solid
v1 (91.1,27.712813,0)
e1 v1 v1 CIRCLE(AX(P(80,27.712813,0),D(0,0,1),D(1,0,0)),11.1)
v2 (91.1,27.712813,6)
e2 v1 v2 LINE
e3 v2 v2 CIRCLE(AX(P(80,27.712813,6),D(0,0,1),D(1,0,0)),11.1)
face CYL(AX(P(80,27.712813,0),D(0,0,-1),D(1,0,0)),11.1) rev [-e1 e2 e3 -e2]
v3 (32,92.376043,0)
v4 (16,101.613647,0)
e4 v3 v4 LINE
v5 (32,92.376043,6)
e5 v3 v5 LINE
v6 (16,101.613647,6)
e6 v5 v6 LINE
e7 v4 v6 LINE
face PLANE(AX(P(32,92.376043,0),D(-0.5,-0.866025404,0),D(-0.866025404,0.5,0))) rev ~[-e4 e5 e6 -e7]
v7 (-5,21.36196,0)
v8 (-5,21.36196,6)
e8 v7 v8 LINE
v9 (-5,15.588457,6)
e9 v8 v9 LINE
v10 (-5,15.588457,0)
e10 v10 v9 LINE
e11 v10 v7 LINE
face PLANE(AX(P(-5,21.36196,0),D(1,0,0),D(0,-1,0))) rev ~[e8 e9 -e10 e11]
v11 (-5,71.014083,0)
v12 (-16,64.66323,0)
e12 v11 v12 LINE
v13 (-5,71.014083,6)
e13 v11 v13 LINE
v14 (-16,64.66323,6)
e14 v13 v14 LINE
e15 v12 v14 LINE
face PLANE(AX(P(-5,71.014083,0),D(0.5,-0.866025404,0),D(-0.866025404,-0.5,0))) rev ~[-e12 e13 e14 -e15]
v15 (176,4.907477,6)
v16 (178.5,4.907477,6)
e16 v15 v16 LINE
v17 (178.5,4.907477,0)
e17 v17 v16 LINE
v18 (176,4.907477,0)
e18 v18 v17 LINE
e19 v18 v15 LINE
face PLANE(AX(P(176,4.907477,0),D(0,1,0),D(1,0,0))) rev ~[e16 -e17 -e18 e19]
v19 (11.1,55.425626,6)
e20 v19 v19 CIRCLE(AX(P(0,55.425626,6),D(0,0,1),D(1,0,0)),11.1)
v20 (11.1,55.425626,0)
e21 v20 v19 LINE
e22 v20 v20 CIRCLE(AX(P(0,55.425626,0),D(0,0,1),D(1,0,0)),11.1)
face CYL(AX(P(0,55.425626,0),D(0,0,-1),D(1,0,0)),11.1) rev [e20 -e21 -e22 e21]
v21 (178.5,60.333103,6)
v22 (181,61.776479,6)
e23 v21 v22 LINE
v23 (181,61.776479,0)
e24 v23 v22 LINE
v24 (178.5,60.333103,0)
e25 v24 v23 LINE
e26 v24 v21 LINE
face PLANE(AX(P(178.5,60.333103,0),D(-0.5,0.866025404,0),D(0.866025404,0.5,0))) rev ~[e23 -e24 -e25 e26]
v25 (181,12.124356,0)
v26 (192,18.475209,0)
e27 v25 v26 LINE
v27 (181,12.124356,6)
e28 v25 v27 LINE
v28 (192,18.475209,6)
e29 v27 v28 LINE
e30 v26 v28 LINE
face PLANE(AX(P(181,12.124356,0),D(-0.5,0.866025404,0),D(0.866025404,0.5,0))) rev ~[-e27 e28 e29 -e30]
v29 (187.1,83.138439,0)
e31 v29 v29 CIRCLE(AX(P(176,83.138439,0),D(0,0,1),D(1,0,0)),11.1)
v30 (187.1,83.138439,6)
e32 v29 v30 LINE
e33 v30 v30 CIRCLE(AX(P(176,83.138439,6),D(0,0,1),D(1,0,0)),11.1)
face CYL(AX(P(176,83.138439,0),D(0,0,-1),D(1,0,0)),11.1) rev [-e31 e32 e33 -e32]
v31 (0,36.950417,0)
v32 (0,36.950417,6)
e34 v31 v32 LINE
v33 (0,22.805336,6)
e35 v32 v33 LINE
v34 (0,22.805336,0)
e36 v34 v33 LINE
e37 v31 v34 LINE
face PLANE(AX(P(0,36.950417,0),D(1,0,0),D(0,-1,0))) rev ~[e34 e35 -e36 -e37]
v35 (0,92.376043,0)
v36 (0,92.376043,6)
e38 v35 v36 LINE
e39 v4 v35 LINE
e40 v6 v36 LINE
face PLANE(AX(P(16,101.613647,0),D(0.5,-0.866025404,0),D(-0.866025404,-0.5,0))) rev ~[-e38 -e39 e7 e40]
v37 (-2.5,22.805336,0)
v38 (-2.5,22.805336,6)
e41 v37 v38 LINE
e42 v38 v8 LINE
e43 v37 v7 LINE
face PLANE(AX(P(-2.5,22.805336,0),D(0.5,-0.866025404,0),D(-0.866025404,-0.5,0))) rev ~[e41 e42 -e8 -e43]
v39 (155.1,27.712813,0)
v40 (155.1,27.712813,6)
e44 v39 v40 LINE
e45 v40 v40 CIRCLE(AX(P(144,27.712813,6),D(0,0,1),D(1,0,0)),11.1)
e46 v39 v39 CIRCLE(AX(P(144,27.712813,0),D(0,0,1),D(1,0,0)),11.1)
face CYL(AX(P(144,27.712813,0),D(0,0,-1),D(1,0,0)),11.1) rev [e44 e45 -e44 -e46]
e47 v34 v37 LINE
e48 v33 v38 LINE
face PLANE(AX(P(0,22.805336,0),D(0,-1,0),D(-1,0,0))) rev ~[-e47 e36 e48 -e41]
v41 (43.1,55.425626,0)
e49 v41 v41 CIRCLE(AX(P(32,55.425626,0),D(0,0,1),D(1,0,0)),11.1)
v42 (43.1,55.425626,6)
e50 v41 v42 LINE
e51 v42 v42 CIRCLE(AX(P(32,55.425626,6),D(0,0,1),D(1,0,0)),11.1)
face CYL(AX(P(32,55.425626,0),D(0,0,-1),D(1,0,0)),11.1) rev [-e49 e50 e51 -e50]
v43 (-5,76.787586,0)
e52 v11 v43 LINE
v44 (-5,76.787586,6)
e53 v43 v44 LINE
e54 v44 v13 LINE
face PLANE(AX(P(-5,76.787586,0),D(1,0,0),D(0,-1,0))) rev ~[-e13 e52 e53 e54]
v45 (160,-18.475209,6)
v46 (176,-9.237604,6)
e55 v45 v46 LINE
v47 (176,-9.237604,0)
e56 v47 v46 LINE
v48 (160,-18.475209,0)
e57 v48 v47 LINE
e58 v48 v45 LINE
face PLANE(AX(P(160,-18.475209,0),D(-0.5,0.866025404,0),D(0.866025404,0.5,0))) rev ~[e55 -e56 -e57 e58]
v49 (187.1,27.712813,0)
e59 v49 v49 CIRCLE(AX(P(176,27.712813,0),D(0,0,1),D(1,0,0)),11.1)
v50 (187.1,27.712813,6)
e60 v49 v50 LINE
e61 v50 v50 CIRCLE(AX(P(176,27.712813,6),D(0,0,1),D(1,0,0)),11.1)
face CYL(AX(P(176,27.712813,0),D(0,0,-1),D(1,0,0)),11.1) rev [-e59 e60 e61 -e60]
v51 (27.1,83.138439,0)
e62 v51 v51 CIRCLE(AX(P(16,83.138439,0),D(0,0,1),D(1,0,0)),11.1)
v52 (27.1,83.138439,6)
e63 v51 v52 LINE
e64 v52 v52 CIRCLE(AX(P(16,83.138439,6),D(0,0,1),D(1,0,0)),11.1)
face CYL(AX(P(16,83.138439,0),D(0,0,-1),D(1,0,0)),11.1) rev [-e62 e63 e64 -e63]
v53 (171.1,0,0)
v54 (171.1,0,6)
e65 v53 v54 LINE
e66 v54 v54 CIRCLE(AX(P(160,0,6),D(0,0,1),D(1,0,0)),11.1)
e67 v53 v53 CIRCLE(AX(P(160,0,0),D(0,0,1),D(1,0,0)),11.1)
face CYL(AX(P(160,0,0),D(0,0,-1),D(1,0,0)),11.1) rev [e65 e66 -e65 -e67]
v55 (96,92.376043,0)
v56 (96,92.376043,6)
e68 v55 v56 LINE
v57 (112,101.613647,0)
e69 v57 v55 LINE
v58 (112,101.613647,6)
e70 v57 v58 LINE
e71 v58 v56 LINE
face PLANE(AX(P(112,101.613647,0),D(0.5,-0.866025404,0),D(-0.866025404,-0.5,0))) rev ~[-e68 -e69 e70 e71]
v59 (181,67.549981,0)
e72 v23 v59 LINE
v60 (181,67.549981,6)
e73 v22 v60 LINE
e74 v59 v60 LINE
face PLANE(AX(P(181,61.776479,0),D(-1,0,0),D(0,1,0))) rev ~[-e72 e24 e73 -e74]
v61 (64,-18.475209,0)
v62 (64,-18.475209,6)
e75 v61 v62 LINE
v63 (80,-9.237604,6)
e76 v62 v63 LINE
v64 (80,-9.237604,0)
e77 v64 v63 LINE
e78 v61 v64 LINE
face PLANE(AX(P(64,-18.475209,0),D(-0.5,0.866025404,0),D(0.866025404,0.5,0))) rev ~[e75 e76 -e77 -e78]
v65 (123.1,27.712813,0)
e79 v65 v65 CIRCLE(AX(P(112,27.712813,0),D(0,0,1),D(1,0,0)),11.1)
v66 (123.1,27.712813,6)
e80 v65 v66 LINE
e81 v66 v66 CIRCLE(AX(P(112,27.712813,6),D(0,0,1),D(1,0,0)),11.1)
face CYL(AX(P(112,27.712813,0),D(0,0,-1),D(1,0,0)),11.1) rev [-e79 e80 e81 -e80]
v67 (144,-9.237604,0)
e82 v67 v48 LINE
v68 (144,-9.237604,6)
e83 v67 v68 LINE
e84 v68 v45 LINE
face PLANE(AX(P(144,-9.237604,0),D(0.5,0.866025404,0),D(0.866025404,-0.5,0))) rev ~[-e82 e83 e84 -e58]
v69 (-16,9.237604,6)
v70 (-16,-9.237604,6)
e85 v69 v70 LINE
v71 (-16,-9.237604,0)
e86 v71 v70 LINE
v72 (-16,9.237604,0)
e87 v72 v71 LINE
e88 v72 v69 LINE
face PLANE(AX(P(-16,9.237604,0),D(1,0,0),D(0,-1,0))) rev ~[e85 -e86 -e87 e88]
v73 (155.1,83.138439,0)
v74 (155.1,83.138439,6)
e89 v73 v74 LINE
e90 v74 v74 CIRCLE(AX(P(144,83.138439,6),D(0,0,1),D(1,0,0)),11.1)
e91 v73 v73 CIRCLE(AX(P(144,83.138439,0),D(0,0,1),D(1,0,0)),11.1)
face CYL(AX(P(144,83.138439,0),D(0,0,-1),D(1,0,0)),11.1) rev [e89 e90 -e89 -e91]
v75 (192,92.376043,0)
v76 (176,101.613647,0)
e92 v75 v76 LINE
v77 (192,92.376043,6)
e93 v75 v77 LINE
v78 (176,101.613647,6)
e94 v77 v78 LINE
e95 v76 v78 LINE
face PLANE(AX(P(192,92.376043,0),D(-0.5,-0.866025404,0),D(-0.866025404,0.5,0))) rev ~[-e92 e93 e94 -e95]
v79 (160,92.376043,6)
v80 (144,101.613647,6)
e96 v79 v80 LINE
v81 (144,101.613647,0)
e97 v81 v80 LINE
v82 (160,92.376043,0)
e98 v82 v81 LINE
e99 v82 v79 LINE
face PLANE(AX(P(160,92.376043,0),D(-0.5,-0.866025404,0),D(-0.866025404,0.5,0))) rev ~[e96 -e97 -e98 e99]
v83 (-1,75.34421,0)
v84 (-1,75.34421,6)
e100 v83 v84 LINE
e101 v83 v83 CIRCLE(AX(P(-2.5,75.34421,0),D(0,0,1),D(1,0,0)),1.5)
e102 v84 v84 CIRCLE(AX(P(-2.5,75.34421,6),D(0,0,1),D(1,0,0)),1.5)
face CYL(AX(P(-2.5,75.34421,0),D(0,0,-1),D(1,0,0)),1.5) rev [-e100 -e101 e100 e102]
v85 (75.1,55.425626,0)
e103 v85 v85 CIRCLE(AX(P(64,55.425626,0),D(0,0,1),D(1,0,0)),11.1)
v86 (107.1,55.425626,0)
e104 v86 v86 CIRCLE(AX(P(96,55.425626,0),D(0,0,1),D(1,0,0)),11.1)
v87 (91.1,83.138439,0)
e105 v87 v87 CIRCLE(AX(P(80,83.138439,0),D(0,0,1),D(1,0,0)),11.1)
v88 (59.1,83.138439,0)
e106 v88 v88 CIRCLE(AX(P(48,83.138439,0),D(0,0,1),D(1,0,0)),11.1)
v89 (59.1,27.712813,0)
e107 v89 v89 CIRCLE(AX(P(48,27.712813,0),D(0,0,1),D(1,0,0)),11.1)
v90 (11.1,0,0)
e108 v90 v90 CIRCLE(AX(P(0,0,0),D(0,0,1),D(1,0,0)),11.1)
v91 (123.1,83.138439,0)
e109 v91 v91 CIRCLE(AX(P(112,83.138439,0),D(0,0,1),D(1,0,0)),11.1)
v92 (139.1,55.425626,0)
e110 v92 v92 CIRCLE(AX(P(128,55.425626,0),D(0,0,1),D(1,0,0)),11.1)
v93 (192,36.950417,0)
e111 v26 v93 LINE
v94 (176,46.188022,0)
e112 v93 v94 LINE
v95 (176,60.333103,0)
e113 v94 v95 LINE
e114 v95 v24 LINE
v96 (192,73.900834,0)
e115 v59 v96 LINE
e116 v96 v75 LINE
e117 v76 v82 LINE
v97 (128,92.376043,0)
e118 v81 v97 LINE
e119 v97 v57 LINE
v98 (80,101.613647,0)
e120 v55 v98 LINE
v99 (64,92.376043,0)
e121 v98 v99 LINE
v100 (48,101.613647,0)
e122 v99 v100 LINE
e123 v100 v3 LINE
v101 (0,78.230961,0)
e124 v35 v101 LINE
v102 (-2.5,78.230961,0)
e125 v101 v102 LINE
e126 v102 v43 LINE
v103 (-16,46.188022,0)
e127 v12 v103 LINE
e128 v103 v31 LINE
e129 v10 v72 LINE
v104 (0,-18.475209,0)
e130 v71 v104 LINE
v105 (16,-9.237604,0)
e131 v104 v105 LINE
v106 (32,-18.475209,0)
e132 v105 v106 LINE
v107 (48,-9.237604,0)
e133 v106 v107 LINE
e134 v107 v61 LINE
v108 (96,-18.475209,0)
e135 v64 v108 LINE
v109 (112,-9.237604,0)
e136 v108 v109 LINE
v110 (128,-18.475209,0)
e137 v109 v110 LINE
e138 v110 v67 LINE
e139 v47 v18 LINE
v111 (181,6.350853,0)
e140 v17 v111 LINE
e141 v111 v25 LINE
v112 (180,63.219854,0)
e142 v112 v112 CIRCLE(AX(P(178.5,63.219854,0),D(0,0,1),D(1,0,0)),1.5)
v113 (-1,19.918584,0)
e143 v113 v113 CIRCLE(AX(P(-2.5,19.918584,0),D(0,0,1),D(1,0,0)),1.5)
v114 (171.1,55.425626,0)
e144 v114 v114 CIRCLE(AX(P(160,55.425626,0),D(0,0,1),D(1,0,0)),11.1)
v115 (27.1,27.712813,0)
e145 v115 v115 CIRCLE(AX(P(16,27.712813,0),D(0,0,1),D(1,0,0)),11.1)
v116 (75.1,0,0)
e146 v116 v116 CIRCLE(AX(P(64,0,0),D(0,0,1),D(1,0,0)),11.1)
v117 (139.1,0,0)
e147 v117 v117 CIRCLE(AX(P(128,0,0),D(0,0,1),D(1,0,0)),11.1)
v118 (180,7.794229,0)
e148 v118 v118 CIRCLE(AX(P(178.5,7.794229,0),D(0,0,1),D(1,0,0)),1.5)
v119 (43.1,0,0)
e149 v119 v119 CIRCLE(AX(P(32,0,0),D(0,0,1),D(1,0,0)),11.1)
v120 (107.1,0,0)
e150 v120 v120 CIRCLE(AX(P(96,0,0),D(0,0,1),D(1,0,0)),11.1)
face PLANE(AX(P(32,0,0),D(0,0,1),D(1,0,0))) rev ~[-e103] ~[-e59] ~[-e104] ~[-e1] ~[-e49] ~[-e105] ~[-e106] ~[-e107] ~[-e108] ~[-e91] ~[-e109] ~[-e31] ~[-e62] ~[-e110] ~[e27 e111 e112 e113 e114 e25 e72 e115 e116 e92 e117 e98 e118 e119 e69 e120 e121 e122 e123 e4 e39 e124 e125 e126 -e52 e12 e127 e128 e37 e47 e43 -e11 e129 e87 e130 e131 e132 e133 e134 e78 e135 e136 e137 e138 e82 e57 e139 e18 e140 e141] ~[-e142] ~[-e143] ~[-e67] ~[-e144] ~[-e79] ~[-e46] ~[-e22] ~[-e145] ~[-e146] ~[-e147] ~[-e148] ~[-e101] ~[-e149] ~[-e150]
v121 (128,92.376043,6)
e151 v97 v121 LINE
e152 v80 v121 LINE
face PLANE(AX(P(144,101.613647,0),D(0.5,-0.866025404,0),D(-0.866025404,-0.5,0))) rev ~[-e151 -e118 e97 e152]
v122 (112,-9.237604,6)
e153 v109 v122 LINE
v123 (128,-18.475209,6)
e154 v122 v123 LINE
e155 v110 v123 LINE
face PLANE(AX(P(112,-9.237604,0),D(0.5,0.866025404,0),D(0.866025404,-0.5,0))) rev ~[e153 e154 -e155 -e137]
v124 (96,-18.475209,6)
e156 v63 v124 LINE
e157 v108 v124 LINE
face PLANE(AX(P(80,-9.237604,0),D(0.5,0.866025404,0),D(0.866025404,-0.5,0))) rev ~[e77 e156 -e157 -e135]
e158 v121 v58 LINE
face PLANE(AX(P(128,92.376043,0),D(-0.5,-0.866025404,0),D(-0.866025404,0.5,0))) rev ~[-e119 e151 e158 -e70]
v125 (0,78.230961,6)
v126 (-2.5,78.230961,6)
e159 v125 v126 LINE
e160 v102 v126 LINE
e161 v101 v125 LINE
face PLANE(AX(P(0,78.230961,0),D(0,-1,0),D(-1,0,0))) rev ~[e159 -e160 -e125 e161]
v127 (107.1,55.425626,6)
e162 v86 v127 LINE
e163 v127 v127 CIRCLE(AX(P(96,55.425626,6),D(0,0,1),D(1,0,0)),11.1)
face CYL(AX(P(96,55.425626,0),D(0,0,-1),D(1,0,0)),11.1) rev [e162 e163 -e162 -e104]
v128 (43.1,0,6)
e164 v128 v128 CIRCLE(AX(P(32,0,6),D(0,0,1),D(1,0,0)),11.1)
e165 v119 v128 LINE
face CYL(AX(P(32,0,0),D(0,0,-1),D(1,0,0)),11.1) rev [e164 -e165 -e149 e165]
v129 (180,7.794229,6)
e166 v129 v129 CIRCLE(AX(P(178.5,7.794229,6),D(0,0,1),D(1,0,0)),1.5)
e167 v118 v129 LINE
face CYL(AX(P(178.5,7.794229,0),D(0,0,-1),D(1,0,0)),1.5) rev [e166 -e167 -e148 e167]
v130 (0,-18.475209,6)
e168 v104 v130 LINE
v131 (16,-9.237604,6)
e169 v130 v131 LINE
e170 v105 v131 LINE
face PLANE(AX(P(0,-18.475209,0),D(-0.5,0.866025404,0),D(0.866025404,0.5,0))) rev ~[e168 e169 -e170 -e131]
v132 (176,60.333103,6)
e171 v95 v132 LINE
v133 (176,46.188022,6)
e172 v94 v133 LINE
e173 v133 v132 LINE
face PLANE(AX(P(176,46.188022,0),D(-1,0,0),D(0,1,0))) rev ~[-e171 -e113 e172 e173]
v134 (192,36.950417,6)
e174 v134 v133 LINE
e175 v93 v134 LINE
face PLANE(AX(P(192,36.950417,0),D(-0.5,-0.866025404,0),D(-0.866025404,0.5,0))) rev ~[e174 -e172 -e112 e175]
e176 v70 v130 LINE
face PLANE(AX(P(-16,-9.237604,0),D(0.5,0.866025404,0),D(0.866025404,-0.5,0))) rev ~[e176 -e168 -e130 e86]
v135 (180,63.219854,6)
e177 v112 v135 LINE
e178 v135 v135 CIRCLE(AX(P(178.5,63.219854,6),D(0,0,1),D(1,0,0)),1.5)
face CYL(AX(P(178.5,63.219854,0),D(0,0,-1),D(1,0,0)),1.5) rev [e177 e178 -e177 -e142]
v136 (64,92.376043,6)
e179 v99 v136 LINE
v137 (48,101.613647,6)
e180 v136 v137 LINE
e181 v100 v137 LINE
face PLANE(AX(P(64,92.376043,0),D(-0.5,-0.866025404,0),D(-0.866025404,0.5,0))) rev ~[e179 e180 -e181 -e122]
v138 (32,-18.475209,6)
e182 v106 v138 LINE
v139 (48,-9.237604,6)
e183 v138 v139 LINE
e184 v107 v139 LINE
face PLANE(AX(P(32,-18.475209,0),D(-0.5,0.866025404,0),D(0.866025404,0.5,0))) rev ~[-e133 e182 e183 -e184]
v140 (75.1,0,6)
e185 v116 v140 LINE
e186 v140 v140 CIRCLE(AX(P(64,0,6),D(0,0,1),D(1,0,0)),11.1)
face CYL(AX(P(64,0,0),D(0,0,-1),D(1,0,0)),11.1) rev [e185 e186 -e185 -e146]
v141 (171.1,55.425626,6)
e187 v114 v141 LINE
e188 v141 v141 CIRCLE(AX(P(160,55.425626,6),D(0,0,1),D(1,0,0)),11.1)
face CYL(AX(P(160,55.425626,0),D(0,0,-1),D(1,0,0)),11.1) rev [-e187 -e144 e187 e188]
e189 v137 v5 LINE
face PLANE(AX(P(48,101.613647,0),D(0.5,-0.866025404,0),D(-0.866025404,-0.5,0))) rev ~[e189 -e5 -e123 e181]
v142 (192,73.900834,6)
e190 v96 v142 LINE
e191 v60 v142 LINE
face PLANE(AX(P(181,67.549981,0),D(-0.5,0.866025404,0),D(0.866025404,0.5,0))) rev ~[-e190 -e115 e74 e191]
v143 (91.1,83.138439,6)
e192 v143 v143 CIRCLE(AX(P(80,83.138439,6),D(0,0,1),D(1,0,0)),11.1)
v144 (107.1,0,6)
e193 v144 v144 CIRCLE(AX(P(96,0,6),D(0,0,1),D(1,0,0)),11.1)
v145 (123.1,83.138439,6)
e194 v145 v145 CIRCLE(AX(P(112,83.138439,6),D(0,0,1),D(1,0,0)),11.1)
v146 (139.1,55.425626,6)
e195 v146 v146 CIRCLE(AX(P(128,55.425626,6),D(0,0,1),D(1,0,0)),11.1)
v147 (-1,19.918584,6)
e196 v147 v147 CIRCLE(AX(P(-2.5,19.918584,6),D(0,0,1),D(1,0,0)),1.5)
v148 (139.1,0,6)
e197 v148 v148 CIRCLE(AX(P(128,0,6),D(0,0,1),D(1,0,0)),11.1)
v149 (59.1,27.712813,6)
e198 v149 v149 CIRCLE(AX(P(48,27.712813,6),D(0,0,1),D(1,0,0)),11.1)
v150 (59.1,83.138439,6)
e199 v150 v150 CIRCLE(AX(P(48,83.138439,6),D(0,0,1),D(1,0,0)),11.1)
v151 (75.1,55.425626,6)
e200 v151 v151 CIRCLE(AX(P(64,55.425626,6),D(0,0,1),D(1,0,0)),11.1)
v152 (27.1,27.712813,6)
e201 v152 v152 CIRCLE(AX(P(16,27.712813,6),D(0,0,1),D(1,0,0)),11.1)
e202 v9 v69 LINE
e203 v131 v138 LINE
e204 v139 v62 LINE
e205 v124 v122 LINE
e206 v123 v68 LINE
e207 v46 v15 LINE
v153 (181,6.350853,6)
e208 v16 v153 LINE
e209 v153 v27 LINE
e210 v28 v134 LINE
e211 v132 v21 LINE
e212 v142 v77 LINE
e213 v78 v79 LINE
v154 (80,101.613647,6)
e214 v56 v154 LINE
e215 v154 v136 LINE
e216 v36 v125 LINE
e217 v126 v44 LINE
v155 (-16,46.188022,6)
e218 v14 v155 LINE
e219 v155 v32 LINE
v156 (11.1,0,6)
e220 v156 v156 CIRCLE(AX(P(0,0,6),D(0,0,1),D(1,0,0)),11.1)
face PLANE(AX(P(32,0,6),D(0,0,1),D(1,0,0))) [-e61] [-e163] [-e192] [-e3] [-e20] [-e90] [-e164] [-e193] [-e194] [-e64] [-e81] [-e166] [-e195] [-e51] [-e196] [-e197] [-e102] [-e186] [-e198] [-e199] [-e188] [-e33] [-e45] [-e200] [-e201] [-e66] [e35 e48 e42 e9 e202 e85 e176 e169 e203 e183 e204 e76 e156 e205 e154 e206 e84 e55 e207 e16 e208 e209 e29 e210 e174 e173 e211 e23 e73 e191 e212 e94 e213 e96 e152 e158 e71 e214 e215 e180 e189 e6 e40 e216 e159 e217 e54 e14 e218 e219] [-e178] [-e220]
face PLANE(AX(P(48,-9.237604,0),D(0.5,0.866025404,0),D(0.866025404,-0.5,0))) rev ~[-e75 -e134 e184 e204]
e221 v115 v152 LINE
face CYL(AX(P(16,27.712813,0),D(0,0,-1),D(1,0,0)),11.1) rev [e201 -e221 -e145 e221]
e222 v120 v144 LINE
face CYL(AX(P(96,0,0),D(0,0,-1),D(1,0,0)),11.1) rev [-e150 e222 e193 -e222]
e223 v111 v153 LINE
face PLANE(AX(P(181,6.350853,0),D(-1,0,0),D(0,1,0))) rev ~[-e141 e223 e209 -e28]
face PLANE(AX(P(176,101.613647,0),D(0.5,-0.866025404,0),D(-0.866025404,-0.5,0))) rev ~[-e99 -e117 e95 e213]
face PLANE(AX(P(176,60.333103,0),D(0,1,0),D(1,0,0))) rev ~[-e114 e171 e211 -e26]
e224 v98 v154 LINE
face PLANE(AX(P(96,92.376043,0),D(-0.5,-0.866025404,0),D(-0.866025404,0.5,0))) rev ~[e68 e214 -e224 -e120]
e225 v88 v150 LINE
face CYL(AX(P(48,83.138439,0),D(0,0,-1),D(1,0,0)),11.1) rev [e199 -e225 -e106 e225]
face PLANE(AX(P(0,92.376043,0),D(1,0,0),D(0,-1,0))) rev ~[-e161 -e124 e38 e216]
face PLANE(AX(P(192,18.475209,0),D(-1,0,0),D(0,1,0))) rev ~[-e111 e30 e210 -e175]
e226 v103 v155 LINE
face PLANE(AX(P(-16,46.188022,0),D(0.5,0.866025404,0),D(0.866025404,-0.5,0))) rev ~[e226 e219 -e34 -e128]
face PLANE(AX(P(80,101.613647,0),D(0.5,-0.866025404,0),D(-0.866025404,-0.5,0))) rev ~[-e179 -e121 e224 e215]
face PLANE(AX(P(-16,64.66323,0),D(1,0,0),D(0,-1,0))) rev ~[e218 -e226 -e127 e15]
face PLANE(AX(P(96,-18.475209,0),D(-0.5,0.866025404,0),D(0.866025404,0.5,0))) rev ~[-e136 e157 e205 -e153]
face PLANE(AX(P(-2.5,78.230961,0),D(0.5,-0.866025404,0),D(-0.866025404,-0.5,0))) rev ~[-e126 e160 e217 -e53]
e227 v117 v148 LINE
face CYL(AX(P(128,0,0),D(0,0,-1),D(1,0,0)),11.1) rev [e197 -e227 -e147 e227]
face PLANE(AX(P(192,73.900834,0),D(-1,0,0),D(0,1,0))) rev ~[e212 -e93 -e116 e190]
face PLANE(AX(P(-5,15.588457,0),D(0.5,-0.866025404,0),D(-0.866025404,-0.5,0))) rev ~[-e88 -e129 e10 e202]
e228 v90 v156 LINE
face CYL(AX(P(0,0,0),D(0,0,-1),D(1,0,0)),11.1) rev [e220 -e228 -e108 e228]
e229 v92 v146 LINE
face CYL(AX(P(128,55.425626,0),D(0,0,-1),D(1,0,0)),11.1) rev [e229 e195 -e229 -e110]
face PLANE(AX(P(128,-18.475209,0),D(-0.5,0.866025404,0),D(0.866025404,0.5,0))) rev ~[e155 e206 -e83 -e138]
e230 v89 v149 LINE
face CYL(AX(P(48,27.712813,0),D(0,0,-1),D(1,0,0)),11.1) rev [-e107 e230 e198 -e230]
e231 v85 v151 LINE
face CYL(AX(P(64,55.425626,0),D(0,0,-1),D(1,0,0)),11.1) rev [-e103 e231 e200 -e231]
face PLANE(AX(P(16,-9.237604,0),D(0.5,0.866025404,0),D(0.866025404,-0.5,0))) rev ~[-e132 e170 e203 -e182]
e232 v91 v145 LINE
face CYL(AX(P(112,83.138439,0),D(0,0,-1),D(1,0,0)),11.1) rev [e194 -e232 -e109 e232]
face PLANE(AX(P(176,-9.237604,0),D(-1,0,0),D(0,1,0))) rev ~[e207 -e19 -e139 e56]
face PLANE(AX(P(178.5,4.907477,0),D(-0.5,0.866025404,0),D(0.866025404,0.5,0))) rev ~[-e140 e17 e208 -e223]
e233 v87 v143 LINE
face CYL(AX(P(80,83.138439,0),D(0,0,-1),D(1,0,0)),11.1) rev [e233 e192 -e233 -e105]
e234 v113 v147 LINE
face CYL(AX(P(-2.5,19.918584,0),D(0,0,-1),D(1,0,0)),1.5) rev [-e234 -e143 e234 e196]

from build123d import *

# Parameters (mm, degrees)
F0_R     = 11.1
F0_R_2   = 1.5
F1_DEPTH = 6
F2_DEPTH = 6


# Not quite as in the source:
# - a feature names something its author has since deleted; it is built from what else it names


with BuildPart() as f1:
    # F0 (on Top) → F1 (new body)
    with BuildSketch(Plane.XY):
        Polygon((32, 18.4752086141), (16, 9.237604307), (16, -9.237604307), (32, -18.4752086141), (48, -9.237604307), (48, 9.237604307), align=None)
        with Locations((32, 0)):
            Circle(F0_R, mode=Mode.SUBTRACT)
        Polygon((16, -9.237604307), (16, 9.237604307), (0, 18.4752086141), (-2.5, 17.0318329411), (-5, 15.5884572681), (-16, 9.237604307), (-16, -9.237604307), (0, -18.4752086141), align=None)
        Circle(F0_R, mode=Mode.SUBTRACT)
        Polygon((0, 18.4752086141), (16, 9.237604307), (32, 18.4752086141), (32, 36.9504172281), (16, 46.1880215352), (0, 36.9504172281), (0, 22.805335633), (0, 21.36195996), align=None)
        with Locations((16, 27.7128129211)):
            Circle(F0_R, mode=Mode.SUBTRACT)
        Polygon((-2.5, 17.0318329411), (0, 18.4752086141), (0, 21.36195996), (-2.5, 22.805335633), (-5, 21.36195996), (-5, 18.4752086141), align=None)
        with Locations((-2.5, 19.918584287)):
            Circle(F0_R_2, mode=Mode.SUBTRACT)
        Polygon((32, 36.9504172281), (32, 18.4752086141), (48, 9.237604307), (64, 18.4752086141), (64, 36.9504172281), (48, 46.1880215352), align=None)
        with Locations((48, 27.7128129211)):
            Circle(F0_R, mode=Mode.SUBTRACT)
        Polygon((64, 18.4752086141), (48, 9.237604307), (48, -9.237604307), (64, -18.4752086141), (80, -9.237604307), (80, 9.237604307), align=None)
        with Locations((64, 0)):
            Circle(F0_R, mode=Mode.SUBTRACT)
        Polygon((16, 46.1880215352), (32, 36.9504172281), (48, 46.1880215352), (48, 64.6632301492), (32, 73.9008344563), (16, 64.6632301492), align=None)
        with Locations((32, 55.4256258422)):
            Circle(F0_R, mode=Mode.SUBTRACT)
        Polygon((64, 36.9504172281), (64, 18.4752086141), (80, 9.237604307), (96, 18.4752086141), (96, 36.9504172281), (80, 46.1880215352), align=None)
        with Locations((80, 27.7128129211)):
            Circle(F0_R, mode=Mode.SUBTRACT)
        Polygon((0, 36.9504172281), (16, 46.1880215352), (16, 64.6632301492), (0, 73.9008344563), (-2.5, 72.4574587833), (-5, 71.0140831103), (-16, 64.6632301492), (-16, 46.1880215352), align=None)
        with Locations((0, 55.4256258422)):
            Circle(F0_R, mode=Mode.SUBTRACT)
        Polygon((48, 64.6632301492), (48, 46.1880215352), (64, 36.9504172281), (80, 46.1880215352), (80, 64.6632301492), (64, 73.9008344563), align=None)
        with Locations((64, 55.4256258422)):
            Circle(F0_R, mode=Mode.SUBTRACT)
        Polygon((96, 18.4752086141), (80, 9.237604307), (80, -9.237604307), (96, -18.4752086141), (112, -9.237604307), (112, 9.237604307), align=None)
        with Locations((96, 0)):
            Circle(F0_R, mode=Mode.SUBTRACT)
        Polygon((32, 73.9008344563), (48, 64.6632301492), (64, 73.9008344563), (64, 92.3760430703), (48, 101.6136473774), (32, 92.3760430703), align=None)
        with Locations((48, 83.1384387633)):
            Circle(F0_R, mode=Mode.SUBTRACT)
        Polygon((96, 36.9504172281), (96, 18.4752086141), (112, 9.237604307), (128, 18.4752086141), (128, 36.9504172281), (112, 46.1880215352), align=None)
        with Locations((112, 27.7128129211)):
            Circle(F0_R, mode=Mode.SUBTRACT)
        Polygon((80, 64.6632301492), (80, 46.1880215352), (96, 36.9504172281), (112, 46.1880215352), (112, 64.6632301492), (96, 73.9008344563), align=None)
        with Locations((96, 55.4256258422)):
            Circle(F0_R, mode=Mode.SUBTRACT)
        Polygon((-2.5, 72.4574587833), (0, 73.9008344563), (0, 76.7875858022), (-2.5, 78.2309614752), (-5, 76.7875858022), (-5, 73.9008344563), align=None)
        with Locations((-2.5, 75.3442101292)):
            Circle(F0_R_2, mode=Mode.SUBTRACT)
        Polygon((64, 92.3760430703), (64, 73.9008344563), (80, 64.6632301492), (96, 73.9008344563), (96, 92.3760430703), (80, 101.6136473774), align=None)
        with Locations((80, 83.1384387633)):
            Circle(F0_R, mode=Mode.SUBTRACT)
        Polygon((128, 18.4752086141), (112, 9.237604307), (112, -9.237604307), (128, -18.4752086141), (144, -9.237604307), (144, 9.237604307), align=None)
        with Locations((128, 0)):
            Circle(F0_R, mode=Mode.SUBTRACT)
        Polygon((128, 36.9504172281), (128, 18.4752086141), (144, 9.237604307), (160, 18.4752086141), (160, 36.9504172281), (144, 46.1880215352), align=None)
        with Locations((144, 27.7128129211)):
            Circle(F0_R, mode=Mode.SUBTRACT)
        Polygon((112, 64.6632301492), (112, 46.1880215352), (128, 36.9504172281), (144, 46.1880215352), (144, 64.6632301492), (128, 73.9008344563), align=None)
        with Locations((128, 55.4256258422)):
            Circle(F0_R, mode=Mode.SUBTRACT)
        Polygon((96, 92.3760430703), (96, 73.9008344563), (112, 64.6632301492), (128, 73.9008344563), (128, 92.3760430703), (112, 101.6136473774), align=None)
        with Locations((112, 83.1384387633)):
            Circle(F0_R, mode=Mode.SUBTRACT)
        Polygon((160, 18.4752086141), (144, 9.237604307), (144, -9.237604307), (160, -18.4752086141), (176, -9.237604307), (176, 4.9074772881), (176, 6.3508529611), (176, 9.237604307), align=None)
        with Locations((160, 0)):
            Circle(F0_R, mode=Mode.SUBTRACT)
        Polygon((160, 36.9504172281), (160, 18.4752086141), (176, 9.237604307), (178.5, 10.68097998), (181, 12.124355653), (192, 18.4752086141), (192, 36.9504172281), (176, 46.1880215352), align=None)
        with Locations((176, 27.7128129211)):
            Circle(F0_R, mode=Mode.SUBTRACT)
        Polygon((144, 64.6632301492), (144, 46.1880215352), (160, 36.9504172281), (176, 46.1880215352), (176, 60.3331031303), (176, 61.7764788033), (176, 64.6632301492), (160, 73.9008344563), align=None)
        with Locations((160, 55.4256258422)):
            Circle(F0_R, mode=Mode.SUBTRACT)
        Polygon((128, 92.3760430703), (128, 73.9008344563), (144, 64.6632301492), (160, 73.9008344563), (160, 92.3760430703), (144, 101.6136473774), align=None)
        with Locations((144, 83.1384387633)):
            Circle(F0_R, mode=Mode.SUBTRACT)
        Polygon((160, 92.3760430703), (160, 73.9008344563), (176, 64.6632301492), (178.5, 66.1066058222), (181, 67.5499814952), (192, 73.9008344563), (192, 92.3760430703), (176, 101.6136473774), align=None)
        with Locations((176, 83.1384387633)):
            Circle(F0_R, mode=Mode.SUBTRACT)
    extrude(amount=F1_DEPTH)

    # F0 (on Top) → F2 (join)
    with BuildSketch(Plane.XY):
        Polygon((0, 18.4752086141), (16, 9.237604307), (32, 18.4752086141), (32, 36.9504172281), (16, 46.1880215352), (0, 36.9504172281), (0, 22.805335633), (0, 21.36195996), align=None)
        with Locations((16, 27.7128129211)):
            Circle(F0_R, mode=Mode.SUBTRACT)
        Polygon((0, 73.9008344563), (16, 64.6632301492), (32, 73.9008344563), (32, 92.3760430703), (16, 101.6136473774), (0, 92.3760430703), (0, 78.2309614752), (0, 76.7875858022), align=None)
        with Locations((16, 83.1384387633)):
            Circle(F0_R, mode=Mode.SUBTRACT)
        Polygon((178.5, 10.68097998), (176, 9.237604307), (176, 6.3508529611), (178.5, 4.9074772881), (181, 6.3508529611), (181, 9.237604307), align=None)
        with Locations((178.5, 7.7942286341)):
            Circle(F0_R_2, mode=Mode.SUBTRACT)
        Polygon((178.5, 66.1066058222), (176, 64.6632301492), (176, 61.7764788033), (178.5, 60.3331031303), (181, 61.7764788033), (181, 64.6632301492), align=None)
        with Locations((178.5, 63.2198544763)):
            Circle(F0_R_2, mode=Mode.SUBTRACT)
        Polygon((-5, 71.0140831103), (-2.5, 72.4574587833), (-5, 73.9008344563), align=None)
        Polygon((-2.5, 78.2309614752), (0, 76.7875858022), (0, 78.2309614752), align=None)
        Polygon((-2.5, 22.805335633), (0, 21.36195996), (0, 22.805335633), align=None)
        Polygon((-5, 15.5884572681), (-2.5, 17.0318329411), (-5, 18.4752086141), align=None)
        Polygon((176, 61.7764788033), (176, 60.3331031303), (178.5, 60.3331031303), align=None)
        Polygon((181, 67.5499814952), (178.5, 66.1066058222), (181, 64.6632301492), align=None)
        Polygon((178.5, 4.9074772881), (176, 6.3508529611), (176, 4.9074772881), align=None)
        Polygon((181, 12.124355653), (178.5, 10.68097998), (181, 9.237604307), align=None)
    extrude(amount=F2_DEPTH)


solid = f1.part
